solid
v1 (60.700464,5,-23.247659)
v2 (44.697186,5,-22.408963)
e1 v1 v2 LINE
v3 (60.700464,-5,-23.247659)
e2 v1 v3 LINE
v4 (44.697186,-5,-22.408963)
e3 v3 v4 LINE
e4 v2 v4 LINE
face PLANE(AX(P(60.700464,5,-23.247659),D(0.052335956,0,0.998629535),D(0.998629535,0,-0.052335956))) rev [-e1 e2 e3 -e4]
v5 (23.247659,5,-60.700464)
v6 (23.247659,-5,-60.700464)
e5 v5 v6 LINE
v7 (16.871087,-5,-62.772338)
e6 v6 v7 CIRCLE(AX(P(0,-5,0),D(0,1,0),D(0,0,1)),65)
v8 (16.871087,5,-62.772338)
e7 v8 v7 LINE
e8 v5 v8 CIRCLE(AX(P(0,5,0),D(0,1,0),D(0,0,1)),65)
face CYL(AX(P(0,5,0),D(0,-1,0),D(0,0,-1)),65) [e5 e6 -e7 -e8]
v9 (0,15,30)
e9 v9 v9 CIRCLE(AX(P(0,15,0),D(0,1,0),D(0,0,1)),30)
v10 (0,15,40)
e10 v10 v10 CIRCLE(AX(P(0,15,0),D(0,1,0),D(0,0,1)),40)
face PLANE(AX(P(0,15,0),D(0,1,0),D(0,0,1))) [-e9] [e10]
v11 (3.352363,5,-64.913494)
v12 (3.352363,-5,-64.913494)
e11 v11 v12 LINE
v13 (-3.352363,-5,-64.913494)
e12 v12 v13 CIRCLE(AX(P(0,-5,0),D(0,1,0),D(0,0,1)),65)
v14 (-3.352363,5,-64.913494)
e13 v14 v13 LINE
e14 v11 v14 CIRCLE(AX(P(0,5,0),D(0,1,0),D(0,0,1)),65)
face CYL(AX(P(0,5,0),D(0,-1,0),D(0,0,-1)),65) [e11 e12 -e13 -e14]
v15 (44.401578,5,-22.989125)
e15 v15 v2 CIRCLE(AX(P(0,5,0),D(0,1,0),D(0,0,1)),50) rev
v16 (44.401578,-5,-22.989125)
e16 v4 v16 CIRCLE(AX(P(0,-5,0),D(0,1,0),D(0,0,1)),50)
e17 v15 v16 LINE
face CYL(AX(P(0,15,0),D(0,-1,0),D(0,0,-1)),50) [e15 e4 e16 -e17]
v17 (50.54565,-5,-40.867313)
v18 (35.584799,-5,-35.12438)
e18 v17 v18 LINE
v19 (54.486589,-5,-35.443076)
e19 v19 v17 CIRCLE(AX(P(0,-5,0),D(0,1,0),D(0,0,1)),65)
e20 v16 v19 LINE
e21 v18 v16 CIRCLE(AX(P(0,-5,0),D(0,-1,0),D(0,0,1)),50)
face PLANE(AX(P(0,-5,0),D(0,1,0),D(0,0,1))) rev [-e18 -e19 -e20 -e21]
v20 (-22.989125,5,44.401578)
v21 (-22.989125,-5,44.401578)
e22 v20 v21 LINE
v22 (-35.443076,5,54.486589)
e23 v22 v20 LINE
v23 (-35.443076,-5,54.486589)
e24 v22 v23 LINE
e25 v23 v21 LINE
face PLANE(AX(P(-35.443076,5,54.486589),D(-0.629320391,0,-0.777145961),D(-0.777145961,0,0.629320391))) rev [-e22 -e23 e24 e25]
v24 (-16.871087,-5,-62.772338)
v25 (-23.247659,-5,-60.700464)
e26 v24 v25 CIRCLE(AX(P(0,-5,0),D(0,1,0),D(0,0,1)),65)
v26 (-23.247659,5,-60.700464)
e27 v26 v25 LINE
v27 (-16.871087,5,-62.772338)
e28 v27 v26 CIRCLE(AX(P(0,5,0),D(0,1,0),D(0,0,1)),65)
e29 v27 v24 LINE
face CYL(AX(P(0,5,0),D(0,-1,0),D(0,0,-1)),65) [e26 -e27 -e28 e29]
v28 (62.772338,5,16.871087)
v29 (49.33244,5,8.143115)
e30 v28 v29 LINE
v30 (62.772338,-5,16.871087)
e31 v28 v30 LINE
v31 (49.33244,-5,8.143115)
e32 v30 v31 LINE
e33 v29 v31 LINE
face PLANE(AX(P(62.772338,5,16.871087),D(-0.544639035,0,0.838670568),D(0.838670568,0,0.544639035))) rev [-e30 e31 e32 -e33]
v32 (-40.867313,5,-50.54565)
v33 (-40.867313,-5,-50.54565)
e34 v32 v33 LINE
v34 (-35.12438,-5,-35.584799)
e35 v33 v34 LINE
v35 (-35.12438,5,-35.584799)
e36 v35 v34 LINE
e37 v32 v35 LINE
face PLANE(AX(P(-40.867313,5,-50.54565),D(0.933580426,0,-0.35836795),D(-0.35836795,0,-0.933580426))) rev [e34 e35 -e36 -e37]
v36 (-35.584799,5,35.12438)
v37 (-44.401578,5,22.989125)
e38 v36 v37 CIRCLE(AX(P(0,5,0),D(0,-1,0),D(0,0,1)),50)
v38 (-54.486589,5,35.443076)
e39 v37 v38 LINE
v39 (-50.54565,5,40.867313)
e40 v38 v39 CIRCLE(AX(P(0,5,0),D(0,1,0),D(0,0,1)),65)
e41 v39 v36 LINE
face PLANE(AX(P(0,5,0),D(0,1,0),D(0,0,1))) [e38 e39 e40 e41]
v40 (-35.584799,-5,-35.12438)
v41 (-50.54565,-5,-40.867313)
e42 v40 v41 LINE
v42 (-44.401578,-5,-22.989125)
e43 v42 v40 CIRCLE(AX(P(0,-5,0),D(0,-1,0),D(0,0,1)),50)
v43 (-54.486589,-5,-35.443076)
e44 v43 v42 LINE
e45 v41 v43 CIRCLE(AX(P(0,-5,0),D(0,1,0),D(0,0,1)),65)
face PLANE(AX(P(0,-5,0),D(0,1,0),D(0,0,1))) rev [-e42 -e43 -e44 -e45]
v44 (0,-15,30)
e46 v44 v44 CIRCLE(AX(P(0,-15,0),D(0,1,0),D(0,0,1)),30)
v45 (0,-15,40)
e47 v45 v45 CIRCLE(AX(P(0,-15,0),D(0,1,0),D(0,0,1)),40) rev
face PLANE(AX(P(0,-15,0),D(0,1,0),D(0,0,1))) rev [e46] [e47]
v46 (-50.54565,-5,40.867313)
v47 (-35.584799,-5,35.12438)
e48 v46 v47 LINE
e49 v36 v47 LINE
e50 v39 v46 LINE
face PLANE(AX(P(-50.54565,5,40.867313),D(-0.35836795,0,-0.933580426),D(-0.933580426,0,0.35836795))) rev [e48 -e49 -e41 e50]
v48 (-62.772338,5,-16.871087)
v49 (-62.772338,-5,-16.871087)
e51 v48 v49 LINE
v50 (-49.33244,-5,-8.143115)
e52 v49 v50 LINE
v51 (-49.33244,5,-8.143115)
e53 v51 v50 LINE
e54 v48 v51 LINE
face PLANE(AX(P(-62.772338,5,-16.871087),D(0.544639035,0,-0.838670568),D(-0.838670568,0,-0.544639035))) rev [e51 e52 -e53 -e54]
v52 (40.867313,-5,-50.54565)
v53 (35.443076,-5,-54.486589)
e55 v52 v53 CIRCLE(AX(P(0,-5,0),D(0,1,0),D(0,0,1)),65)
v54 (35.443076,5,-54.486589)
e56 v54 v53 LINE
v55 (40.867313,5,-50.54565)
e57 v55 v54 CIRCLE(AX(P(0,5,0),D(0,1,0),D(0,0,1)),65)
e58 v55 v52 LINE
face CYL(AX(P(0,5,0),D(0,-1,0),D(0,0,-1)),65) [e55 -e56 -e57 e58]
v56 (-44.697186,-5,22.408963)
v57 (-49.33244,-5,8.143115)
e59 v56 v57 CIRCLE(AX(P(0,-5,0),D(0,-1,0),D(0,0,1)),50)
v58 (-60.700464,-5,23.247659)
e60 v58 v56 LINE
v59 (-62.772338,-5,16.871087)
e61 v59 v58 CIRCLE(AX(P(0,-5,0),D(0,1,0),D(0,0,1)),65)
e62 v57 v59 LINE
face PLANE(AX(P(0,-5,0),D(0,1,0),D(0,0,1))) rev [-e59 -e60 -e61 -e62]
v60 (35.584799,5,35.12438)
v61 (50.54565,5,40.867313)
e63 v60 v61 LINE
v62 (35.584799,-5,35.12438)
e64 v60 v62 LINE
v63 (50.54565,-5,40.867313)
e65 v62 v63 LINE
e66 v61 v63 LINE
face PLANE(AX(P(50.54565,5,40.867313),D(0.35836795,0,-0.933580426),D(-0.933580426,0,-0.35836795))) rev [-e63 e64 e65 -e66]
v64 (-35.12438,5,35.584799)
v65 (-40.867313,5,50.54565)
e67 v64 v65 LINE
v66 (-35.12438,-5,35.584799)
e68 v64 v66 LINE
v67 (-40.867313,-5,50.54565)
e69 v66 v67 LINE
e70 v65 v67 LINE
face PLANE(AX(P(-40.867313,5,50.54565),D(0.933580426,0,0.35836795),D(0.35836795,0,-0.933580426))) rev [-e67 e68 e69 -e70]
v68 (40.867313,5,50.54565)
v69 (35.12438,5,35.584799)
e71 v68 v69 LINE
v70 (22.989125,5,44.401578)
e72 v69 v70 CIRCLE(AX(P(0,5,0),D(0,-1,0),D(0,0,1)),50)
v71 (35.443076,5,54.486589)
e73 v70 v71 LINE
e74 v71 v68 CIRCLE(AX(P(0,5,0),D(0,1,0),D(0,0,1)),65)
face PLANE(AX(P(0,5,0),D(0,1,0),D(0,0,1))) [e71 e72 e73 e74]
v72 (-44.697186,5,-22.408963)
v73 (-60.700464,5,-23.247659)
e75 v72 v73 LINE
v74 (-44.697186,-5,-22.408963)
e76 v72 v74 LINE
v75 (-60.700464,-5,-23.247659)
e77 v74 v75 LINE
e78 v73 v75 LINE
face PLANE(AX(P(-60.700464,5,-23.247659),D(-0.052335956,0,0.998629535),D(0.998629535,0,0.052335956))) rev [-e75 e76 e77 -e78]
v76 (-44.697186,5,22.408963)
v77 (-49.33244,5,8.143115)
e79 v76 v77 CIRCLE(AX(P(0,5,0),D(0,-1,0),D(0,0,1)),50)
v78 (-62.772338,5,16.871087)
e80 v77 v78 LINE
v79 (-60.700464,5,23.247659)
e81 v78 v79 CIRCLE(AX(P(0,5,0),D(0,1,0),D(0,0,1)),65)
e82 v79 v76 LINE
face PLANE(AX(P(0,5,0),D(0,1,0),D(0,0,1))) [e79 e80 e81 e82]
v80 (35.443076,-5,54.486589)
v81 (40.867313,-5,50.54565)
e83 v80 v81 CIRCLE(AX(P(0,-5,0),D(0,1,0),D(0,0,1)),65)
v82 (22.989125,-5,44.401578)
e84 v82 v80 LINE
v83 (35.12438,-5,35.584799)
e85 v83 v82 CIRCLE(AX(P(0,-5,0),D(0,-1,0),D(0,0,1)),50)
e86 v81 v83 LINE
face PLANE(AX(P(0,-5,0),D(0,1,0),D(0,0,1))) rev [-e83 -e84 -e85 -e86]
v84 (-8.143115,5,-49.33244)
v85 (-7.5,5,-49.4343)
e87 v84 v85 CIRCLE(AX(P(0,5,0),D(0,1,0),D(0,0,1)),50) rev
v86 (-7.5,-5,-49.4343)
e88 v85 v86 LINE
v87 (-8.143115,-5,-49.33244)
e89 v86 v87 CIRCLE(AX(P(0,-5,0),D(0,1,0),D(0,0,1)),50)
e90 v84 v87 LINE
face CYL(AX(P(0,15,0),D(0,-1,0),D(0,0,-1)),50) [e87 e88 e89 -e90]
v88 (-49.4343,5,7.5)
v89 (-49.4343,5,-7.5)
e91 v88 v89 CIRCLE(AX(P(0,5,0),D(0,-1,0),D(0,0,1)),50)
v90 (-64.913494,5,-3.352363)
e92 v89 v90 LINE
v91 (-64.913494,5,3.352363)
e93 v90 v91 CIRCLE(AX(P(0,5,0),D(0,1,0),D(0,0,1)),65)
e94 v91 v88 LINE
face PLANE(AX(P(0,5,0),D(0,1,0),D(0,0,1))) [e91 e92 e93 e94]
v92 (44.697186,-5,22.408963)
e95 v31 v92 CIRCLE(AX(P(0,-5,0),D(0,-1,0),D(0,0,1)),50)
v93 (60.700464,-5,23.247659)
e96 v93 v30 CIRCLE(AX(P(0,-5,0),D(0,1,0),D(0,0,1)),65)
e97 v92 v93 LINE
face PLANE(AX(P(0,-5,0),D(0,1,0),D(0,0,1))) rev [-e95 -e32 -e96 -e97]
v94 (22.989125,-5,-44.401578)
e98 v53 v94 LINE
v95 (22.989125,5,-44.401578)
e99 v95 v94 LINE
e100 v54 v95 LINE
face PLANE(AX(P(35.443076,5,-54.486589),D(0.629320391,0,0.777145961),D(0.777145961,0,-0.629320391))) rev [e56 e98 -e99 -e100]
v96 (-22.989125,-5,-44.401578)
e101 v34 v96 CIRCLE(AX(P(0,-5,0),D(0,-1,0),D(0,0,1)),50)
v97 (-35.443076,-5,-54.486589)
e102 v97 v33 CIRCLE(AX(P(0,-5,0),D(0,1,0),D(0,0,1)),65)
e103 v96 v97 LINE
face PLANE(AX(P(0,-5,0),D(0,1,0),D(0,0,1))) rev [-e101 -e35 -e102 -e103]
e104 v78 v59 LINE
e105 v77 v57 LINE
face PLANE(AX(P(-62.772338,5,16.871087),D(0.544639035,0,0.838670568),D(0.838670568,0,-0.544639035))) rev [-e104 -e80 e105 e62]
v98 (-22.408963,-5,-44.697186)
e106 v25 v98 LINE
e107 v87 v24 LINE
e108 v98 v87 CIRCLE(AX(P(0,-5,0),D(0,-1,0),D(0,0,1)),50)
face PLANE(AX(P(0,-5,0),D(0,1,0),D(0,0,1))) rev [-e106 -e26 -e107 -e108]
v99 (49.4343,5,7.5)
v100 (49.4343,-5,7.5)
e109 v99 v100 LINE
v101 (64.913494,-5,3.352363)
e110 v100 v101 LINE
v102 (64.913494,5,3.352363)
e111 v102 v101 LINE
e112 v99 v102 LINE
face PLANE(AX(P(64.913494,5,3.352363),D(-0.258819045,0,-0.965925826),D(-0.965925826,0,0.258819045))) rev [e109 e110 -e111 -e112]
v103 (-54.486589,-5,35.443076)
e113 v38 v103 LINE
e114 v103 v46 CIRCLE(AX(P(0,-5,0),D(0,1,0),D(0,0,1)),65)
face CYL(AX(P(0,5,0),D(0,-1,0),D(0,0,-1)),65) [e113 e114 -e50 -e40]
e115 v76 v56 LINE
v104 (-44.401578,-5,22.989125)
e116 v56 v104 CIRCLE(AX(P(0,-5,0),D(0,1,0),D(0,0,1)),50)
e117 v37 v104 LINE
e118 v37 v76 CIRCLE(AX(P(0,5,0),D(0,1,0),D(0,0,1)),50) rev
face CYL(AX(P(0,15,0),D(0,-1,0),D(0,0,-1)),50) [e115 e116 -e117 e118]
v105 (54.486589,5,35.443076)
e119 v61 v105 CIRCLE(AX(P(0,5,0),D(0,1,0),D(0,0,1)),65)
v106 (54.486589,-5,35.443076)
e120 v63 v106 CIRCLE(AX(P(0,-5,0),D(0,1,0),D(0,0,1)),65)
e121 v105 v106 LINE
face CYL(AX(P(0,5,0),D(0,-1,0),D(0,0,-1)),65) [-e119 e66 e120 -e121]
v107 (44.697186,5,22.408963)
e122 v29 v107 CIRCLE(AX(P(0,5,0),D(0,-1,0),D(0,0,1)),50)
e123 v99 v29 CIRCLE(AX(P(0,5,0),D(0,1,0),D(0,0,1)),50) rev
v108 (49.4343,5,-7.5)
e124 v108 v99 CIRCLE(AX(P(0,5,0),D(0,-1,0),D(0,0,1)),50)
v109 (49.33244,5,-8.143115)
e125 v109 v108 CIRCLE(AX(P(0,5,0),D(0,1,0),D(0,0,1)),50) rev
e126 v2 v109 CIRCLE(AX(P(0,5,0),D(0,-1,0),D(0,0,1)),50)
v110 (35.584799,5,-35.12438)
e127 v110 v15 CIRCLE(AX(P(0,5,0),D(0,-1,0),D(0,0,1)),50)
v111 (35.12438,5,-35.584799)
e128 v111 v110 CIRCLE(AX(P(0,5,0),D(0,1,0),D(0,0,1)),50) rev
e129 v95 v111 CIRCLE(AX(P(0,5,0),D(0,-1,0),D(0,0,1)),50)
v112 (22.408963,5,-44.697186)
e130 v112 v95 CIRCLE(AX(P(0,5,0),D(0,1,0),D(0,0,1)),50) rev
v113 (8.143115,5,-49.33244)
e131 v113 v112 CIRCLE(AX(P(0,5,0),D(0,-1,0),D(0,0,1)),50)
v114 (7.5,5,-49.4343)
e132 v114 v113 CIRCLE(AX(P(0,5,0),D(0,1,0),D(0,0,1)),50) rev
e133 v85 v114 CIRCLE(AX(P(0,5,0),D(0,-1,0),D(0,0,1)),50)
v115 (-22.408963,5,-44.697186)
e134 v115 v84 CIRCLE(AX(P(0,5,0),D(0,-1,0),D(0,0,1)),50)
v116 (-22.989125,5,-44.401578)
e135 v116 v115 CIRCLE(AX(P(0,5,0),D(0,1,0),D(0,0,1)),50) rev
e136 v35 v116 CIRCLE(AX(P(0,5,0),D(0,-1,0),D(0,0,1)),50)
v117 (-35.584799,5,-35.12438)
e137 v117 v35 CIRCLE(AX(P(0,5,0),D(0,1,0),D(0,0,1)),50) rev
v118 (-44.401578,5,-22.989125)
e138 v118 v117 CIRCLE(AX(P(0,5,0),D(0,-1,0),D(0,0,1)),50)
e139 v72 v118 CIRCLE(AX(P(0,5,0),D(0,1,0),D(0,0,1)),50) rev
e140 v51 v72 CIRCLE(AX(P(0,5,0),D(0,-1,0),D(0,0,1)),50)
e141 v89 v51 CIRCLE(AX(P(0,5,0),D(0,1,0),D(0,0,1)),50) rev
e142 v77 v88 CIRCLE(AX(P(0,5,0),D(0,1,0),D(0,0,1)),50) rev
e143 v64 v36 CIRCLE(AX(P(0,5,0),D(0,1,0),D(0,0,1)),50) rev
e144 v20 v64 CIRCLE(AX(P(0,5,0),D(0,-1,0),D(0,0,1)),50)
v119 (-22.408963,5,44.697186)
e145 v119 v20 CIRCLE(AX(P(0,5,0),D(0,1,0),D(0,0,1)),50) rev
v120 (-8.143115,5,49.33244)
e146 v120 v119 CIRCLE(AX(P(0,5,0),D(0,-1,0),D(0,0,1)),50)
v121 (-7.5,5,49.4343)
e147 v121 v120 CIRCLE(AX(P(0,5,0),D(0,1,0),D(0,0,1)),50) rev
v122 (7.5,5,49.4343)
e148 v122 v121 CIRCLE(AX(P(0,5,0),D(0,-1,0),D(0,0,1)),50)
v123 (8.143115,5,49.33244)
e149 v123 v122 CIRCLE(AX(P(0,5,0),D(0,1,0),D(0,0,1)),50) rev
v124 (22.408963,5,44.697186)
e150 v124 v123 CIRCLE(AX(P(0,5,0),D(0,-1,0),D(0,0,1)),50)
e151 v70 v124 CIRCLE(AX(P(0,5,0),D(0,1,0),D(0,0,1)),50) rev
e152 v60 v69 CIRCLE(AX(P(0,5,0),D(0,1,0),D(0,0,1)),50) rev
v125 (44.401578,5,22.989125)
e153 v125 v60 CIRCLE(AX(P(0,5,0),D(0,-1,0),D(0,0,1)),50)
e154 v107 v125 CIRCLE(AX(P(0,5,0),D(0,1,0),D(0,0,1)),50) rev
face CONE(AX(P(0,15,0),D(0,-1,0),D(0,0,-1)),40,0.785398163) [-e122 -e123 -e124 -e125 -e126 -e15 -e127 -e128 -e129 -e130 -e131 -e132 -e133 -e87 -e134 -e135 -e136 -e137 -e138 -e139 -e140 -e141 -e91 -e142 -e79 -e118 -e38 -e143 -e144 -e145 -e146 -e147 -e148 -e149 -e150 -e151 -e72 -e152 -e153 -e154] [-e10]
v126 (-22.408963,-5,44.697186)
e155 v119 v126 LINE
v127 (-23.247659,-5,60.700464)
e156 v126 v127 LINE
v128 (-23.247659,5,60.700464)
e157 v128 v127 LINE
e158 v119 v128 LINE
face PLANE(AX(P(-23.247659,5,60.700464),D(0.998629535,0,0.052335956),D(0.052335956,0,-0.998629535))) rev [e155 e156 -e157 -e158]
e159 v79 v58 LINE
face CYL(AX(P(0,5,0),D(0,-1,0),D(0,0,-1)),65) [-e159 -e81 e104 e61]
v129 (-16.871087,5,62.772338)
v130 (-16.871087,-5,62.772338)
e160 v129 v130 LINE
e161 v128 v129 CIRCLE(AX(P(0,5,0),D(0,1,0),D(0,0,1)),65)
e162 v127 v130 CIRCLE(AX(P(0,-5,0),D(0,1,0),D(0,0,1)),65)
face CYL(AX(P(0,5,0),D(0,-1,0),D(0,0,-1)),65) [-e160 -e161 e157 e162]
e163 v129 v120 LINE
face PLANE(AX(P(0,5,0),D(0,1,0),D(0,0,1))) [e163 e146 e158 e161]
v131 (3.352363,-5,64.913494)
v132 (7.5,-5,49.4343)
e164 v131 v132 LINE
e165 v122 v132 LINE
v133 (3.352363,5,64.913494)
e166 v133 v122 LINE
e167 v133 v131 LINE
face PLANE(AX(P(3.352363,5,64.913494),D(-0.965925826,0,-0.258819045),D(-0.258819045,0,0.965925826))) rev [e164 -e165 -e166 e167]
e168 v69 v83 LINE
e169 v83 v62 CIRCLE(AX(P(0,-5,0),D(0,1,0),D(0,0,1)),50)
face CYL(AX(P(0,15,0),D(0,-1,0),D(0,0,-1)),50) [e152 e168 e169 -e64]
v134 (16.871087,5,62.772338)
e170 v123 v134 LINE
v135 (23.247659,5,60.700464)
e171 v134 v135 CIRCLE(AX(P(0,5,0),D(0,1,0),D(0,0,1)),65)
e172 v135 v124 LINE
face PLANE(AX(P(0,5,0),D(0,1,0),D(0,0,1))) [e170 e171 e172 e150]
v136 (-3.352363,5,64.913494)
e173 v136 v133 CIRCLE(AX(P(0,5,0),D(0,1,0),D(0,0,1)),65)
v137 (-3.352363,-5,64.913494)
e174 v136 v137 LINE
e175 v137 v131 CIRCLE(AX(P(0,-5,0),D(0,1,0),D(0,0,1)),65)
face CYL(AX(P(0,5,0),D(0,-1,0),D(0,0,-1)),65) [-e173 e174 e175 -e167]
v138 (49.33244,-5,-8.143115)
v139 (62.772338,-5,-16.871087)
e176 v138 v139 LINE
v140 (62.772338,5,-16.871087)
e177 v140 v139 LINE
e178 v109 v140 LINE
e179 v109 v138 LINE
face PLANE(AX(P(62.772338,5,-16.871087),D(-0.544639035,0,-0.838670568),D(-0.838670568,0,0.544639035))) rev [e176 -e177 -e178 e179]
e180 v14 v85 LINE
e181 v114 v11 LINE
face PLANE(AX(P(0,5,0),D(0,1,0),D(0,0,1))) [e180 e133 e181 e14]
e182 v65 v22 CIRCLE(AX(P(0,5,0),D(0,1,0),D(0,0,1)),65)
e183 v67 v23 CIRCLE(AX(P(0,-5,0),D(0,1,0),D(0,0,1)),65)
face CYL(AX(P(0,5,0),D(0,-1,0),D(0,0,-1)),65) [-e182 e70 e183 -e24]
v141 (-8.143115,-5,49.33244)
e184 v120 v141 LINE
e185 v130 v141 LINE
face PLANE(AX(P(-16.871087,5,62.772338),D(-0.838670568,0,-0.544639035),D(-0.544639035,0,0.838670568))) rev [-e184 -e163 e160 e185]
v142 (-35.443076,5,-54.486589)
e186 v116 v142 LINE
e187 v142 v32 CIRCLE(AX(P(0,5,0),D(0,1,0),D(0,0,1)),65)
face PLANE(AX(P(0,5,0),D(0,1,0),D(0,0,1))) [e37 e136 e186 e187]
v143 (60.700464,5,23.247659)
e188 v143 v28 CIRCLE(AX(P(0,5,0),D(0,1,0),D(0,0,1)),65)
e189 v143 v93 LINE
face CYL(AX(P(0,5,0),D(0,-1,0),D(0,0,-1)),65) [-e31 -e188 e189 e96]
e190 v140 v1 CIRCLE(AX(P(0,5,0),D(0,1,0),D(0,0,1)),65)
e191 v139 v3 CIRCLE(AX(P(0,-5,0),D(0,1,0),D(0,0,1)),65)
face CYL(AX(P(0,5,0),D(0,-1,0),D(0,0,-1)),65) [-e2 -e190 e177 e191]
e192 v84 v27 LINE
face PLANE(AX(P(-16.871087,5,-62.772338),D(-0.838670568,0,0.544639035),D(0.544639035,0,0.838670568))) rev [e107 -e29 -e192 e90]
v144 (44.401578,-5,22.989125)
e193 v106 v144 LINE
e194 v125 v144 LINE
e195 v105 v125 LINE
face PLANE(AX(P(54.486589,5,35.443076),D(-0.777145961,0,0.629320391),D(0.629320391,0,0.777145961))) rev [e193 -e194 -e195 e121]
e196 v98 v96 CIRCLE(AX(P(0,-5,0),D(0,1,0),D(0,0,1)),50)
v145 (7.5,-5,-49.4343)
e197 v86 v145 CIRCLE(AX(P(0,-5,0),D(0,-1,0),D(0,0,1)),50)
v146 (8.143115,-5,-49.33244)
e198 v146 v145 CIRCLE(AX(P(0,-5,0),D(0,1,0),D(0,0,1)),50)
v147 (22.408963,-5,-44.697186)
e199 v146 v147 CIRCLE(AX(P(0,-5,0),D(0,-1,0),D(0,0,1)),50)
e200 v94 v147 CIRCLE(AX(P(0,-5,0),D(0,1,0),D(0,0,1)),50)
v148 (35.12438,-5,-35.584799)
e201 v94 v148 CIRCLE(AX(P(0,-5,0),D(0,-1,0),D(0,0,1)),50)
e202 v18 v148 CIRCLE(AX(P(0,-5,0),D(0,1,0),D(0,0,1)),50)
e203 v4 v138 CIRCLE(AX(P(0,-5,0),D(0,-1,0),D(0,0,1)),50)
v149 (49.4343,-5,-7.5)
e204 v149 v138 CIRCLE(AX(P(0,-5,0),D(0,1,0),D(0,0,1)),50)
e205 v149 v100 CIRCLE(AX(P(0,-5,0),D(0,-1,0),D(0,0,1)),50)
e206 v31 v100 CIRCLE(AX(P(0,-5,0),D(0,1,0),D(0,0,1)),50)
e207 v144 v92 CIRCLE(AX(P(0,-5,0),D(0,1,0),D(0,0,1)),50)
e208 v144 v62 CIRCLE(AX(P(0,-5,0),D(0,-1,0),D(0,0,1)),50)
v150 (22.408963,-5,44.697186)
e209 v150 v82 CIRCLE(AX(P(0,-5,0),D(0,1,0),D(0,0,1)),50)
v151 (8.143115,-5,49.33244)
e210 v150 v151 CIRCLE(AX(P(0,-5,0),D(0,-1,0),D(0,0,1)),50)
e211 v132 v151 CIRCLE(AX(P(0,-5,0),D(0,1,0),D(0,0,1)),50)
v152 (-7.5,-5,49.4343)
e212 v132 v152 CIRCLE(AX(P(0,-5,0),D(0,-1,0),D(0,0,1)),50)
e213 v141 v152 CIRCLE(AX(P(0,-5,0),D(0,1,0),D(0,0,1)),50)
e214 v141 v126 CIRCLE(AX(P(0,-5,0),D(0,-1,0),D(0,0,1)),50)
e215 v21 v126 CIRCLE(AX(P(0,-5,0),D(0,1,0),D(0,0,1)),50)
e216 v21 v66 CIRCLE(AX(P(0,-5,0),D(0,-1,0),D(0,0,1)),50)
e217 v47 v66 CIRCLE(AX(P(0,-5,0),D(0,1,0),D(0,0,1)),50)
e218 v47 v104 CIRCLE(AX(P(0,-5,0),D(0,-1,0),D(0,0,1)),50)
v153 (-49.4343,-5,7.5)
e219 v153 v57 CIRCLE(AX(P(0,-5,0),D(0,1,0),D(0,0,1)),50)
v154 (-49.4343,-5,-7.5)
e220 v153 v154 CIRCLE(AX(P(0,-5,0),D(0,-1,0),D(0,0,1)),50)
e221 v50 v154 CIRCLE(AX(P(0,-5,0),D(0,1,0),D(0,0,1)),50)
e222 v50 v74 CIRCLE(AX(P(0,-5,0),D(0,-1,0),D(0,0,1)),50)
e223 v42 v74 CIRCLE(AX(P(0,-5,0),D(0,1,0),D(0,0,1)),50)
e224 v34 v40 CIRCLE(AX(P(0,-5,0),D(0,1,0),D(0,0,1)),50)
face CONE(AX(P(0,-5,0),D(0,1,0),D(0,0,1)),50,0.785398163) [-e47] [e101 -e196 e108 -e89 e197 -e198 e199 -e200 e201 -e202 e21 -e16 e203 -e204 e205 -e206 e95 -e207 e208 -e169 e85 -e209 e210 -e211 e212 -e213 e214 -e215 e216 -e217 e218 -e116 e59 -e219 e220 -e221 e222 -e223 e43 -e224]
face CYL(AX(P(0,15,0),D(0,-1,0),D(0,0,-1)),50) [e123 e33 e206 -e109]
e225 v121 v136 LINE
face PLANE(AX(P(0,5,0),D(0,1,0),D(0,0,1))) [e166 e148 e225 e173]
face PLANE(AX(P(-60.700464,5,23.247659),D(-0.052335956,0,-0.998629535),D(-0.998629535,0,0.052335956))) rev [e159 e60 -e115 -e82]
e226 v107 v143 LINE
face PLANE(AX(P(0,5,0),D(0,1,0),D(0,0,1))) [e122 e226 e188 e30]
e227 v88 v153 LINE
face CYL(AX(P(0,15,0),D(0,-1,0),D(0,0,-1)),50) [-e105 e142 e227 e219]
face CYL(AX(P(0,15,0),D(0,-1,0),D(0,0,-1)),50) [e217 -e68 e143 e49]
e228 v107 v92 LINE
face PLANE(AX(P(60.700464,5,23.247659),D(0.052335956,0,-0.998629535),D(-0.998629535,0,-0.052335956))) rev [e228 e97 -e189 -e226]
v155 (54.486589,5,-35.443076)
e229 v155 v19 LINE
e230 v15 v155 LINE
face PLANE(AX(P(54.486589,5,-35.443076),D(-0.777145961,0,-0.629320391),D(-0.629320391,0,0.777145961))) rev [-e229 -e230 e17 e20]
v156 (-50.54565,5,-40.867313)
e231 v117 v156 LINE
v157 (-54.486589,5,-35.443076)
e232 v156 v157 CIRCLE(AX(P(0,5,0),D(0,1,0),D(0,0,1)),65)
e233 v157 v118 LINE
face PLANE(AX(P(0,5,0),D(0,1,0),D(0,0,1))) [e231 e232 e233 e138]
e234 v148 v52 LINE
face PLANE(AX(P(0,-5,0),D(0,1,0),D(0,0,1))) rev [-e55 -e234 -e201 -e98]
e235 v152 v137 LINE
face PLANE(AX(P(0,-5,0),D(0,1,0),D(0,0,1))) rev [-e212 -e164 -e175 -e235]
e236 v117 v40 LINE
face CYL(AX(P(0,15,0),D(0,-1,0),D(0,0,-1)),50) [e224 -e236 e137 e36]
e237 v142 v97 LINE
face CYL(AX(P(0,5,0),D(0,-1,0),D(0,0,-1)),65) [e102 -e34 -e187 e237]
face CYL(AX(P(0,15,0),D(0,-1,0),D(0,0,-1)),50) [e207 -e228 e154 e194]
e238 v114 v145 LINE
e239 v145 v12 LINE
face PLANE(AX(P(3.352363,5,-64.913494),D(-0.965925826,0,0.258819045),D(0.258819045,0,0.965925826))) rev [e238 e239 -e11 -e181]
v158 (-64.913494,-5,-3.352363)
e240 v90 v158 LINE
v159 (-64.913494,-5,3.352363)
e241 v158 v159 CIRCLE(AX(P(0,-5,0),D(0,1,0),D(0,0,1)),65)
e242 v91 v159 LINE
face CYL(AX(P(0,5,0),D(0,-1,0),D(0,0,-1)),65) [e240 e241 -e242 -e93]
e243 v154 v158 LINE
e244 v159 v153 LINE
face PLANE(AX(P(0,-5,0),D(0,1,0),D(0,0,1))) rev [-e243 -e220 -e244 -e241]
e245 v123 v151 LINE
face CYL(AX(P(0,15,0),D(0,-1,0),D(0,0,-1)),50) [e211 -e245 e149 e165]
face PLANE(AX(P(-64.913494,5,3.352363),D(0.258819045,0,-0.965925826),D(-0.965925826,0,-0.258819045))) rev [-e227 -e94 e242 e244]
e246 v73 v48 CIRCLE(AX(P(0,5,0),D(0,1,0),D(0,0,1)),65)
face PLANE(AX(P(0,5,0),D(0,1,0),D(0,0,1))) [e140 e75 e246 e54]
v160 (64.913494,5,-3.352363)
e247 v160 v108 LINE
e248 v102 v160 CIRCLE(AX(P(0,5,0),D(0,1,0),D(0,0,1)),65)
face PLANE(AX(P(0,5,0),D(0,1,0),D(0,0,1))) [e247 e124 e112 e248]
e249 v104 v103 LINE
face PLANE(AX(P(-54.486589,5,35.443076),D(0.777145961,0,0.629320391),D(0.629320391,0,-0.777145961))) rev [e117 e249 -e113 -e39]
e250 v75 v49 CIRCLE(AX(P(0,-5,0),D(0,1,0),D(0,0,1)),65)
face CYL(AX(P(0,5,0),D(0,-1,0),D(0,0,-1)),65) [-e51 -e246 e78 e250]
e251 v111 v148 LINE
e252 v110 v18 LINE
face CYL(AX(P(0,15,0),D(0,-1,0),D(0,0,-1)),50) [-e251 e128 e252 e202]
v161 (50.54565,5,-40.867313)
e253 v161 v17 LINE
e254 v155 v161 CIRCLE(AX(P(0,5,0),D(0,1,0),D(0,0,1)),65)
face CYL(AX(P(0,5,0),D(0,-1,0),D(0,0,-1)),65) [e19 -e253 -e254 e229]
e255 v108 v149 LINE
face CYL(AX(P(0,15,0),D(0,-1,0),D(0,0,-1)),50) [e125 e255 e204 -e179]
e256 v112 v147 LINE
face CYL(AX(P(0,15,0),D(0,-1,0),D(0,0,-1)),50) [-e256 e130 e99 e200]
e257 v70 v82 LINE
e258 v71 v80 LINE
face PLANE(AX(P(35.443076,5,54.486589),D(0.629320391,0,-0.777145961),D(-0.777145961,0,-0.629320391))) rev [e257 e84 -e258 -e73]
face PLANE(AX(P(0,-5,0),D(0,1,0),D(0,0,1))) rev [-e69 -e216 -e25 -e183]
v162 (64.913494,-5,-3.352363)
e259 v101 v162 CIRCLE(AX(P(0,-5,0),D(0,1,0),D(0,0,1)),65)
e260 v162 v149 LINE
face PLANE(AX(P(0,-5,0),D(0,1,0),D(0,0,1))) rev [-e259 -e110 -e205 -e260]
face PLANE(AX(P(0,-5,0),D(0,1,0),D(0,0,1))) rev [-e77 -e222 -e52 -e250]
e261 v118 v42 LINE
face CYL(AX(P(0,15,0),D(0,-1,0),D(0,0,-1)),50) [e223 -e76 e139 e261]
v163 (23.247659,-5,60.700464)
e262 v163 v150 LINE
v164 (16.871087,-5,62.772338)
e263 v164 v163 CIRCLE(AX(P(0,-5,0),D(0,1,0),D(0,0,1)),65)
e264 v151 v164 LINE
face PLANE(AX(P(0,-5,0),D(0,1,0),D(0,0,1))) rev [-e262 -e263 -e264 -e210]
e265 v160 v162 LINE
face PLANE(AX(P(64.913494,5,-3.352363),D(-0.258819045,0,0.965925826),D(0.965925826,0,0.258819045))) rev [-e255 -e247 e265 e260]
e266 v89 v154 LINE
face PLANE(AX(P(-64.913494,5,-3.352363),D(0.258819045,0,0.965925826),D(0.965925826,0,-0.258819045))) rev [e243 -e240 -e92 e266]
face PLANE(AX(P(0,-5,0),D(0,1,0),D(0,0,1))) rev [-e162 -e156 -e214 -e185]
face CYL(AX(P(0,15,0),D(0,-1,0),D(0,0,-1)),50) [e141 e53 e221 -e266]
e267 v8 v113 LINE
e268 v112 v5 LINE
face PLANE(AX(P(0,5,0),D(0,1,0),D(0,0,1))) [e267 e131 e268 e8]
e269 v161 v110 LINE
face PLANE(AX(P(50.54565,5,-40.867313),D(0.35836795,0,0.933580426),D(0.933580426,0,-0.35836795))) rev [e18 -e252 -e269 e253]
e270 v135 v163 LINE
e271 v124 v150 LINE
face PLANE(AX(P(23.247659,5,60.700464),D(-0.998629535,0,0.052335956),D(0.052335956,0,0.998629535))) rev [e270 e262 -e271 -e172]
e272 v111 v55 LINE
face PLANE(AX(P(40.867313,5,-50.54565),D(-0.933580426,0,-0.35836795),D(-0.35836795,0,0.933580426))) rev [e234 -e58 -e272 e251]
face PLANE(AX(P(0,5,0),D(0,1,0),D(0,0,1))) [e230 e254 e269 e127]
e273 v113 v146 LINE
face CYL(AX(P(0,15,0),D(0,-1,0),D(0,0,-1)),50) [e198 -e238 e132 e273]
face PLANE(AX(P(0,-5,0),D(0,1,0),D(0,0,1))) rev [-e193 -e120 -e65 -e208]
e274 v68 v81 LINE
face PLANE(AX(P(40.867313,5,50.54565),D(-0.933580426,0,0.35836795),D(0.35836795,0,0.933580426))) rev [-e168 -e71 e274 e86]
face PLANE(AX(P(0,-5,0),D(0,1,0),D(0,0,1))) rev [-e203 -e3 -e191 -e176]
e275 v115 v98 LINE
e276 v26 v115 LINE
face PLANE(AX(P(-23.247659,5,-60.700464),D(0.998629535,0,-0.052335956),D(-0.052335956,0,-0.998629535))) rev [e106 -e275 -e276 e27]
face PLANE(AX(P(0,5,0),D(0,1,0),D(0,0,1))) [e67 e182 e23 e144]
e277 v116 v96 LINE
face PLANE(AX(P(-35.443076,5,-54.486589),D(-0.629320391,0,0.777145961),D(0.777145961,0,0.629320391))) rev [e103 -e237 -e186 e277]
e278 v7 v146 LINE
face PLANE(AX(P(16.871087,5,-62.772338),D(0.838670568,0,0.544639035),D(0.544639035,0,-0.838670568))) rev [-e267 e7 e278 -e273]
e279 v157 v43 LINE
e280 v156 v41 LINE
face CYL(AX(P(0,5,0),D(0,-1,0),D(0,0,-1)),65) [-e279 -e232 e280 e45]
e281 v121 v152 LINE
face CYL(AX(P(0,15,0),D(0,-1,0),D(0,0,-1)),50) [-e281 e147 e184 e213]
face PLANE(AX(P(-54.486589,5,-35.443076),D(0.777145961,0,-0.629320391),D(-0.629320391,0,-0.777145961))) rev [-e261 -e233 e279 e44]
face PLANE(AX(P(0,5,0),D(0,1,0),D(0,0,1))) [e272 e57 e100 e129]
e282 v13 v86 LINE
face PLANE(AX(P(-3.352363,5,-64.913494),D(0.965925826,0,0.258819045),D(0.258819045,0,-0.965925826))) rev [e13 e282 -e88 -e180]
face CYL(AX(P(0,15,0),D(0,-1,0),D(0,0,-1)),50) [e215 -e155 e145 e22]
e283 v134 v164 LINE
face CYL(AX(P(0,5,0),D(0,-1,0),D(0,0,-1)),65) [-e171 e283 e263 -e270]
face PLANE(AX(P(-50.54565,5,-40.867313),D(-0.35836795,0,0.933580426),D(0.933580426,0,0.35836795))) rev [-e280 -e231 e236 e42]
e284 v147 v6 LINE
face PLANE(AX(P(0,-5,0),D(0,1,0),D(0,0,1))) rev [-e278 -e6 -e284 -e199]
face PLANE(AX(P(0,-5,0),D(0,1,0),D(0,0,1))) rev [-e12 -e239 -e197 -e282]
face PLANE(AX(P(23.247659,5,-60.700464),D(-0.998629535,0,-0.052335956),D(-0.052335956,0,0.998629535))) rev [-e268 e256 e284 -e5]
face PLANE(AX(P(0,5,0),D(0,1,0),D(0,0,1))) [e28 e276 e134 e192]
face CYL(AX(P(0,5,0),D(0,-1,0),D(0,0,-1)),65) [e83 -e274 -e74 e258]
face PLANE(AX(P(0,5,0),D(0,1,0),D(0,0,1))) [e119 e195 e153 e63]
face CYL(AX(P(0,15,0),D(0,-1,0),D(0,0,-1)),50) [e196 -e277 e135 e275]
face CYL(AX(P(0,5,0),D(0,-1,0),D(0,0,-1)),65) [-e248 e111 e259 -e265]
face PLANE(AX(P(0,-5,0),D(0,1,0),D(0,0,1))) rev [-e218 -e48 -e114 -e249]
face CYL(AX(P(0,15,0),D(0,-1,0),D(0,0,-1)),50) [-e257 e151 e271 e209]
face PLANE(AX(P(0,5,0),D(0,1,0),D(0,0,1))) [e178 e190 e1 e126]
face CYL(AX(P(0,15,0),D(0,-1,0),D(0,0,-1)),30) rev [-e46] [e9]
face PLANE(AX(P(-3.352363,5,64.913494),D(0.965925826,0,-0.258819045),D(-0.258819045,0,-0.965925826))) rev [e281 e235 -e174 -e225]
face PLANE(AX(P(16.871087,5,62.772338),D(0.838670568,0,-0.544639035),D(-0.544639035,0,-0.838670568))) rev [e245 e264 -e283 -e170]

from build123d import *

# Parameters (mm, degrees)
EXTRUDE_1_DEPTH    = 5
EXTRUDE_1_2_DEPTH  = 5
EXTRUDE_1_3_DEPTH  = 5
EXTRUDE_1_4_DEPTH  = 5
EXTRUDE_1_5_DEPTH  = 5
EXTRUDE_1_6_DEPTH  = 5
EXTRUDE_1_7_DEPTH  = 5
EXTRUDE_1_8_DEPTH  = 5
EXTRUDE_1_9_DEPTH  = 5
EXTRUDE_1_10_DEPTH = 5
EXTRUDE_1_11_DEPTH = 5
EXTRUDE_1_12_DEPTH = 5
EXTRUDE_1_13_DEPTH = 5
EXTRUDE_1_14_DEPTH = 5
EXTRUDE_1_15_DEPTH = 5
EXTRUDE_1_16_DEPTH = 5
EXTRUDE_1_17_DEPTH = 5
EXTRUDE_1_18_DEPTH = 5
EXTRUDE_1_19_DEPTH = 5
EXTRUDE_1_20_DEPTH = 5
SKETCH_2_R         = 50
SKETCH_2_R_2       = 30
EXTRUDE_2_DEPTH    = 15
CHAMFER_1_SIZE     = 10


with BuildPart() as part:
    # 草图1 → 凸台-拉伸1 (new, symmetric)
    with BuildSketch(Plane(origin=(0, 0, 0), x_dir=(1, 0, 0), z_dir=(0, 1, 0))):
        with BuildLine():
            Line((-3.352362501, 64.91349371), (-7.5, 49.434299833))
            ThreePointArc((-7.5, 49.434299833), (0, 50), (7.5, 49.434299833))
            Line((7.5, 49.434299833), (3.352362501, 64.91349371))
            ThreePointArc((3.352362501, 64.91349371), (0, 65), (-3.352362501, 64.91349371))
        make_face()
    extrude(amount=EXTRUDE_1_DEPTH, both=True)



with BuildPart() as body_2:
    # 草图1 → Extrude 1 2 (new, symmetric)
    with BuildSketch(Plane(origin=(0, 0, 0), x_dir=(1, 0, 0), z_dir=(0, 1, 0))):
        with BuildLine():
            Line((16.871086519, 62.772338173), (8.143114881, 49.332440443))
            ThreePointArc((8.143114881, 49.332440443), (15.450849719, 47.552825815), (22.408962626, 44.697185527))
            Line((22.408962626, 44.697185527), (23.247658922, 60.700464204))
            ThreePointArc((23.247658922, 60.700464204), (20.086104634, 61.818673559), (16.871086519, 62.772338173))
        make_face()
    extrude(amount=EXTRUDE_1_2_DEPTH, both=True)


with BuildPart() as body_3:
    # 草图1 → Extrude 1 3 (new, symmetric)
    with BuildSketch(Plane(origin=(0, 0, 0), x_dir=(1, 0, 0), z_dir=(0, 1, 0))):
        with BuildLine():
            Line((35.443076043, 54.486588814), (22.989124942, 44.401578062))
            ThreePointArc((22.989124942, 44.401578062), (29.389262615, 40.450849719), (35.124379857, 35.584799278))
            Line((35.124379857, 35.584799278), (40.867312512, 50.545650337))
            ThreePointArc((40.867312512, 50.545650337), (38.206041399, 52.586104634), (35.443076043, 54.486588814))
        make_face()
    extrude(amount=EXTRUDE_1_3_DEPTH, both=True)


with BuildPart() as body_4:
    # 草图1 → Extrude 1 4 (new, symmetric)
    with BuildSketch(Plane(origin=(0, 0, 0), x_dir=(1, 0, 0), z_dir=(0, 1, 0))):
        with BuildLine():
            Line((50.545650337, 40.867312512), (35.584799278, 35.124379857))
            ThreePointArc((35.584799278, 35.124379857), (40.450849719, 29.389262615), (44.401578062, 22.989124942))
            Line((44.401578062, 22.989124942), (54.486588814, 35.443076043))
            ThreePointArc((54.486588814, 35.443076043), (52.586104634, 38.206041399), (50.545650337, 40.867312512))
        make_face()
    extrude(amount=EXTRUDE_1_4_DEPTH, both=True)


with BuildPart() as body_5:
    # 草图1 → Extrude 1 5 (new, symmetric)
    with BuildSketch(Plane(origin=(0, 0, 0), x_dir=(1, 0, 0), z_dir=(0, 1, 0))):
        with BuildLine():
            Line((60.700464204, 23.247658922), (44.697185527, 22.408962626))
            ThreePointArc((44.697185527, 22.408962626), (47.552825815, 15.450849719), (49.332440443, 8.143114881))
            Line((49.332440443, 8.143114881), (62.772338173, 16.871086519))
            ThreePointArc((62.772338173, 16.871086519), (61.818673559, 20.086104634), (60.700464204, 23.247658922))
        make_face()
    extrude(amount=EXTRUDE_1_5_DEPTH, both=True)


with BuildPart() as body_6:
    # 草图1 → Extrude 1 6 (new, symmetric)
    with BuildSketch(Plane(origin=(0, 0, 0), x_dir=(1, 0, 0), z_dir=(0, 1, 0))):
        with BuildLine():
            Line((64.91349371, 3.352362501), (49.434299833, 7.5))
            ThreePointArc((49.434299833, 7.5), (50, 0), (49.434299833, -7.5))
            Line((49.434299833, -7.5), (64.91349371, -3.352362501))
            ThreePointArc((64.91349371, -3.352362501), (65, 0), (64.91349371, 3.352362501))
        make_face()
    extrude(amount=EXTRUDE_1_6_DEPTH, both=True)


with BuildPart() as body_7:
    # 草图1 → Extrude 1 7 (new, symmetric)
    with BuildSketch(Plane(origin=(0, 0, 0), x_dir=(1, 0, 0), z_dir=(0, 1, 0))):
        with BuildLine():
            Line((62.772338173, -16.871086519), (49.332440443, -8.143114881))
            ThreePointArc((49.332440443, -8.143114881), (47.552825815, -15.450849719), (44.697185527, -22.408962626))
            Line((44.697185527, -22.408962626), (60.700464204, -23.247658922))
            ThreePointArc((60.700464204, -23.247658922), (61.818673559, -20.086104634), (62.772338173, -16.871086519))
        make_face()
    extrude(amount=EXTRUDE_1_7_DEPTH, both=True)


with BuildPart() as body_8:
    # 草图1 → Extrude 1 8 (new, symmetric)
    with BuildSketch(Plane(origin=(0, 0, 0), x_dir=(1, 0, 0), z_dir=(0, 1, 0))):
        with BuildLine():
            Line((54.486588814, -35.443076043), (44.401578062, -22.989124942))
            ThreePointArc((44.401578062, -22.989124942), (40.450849719, -29.389262615), (35.584799278, -35.124379857))
            Line((35.584799278, -35.124379857), (50.545650337, -40.867312512))
            ThreePointArc((50.545650337, -40.867312512), (52.586104634, -38.206041399), (54.486588814, -35.443076043))
        make_face()
    extrude(amount=EXTRUDE_1_8_DEPTH, both=True)


with BuildPart() as body_9:
    # 草图1 → Extrude 1 9 (new, symmetric)
    with BuildSketch(Plane(origin=(0, 0, 0), x_dir=(1, 0, 0), z_dir=(0, 1, 0))):
        with BuildLine():
            Line((40.867312512, -50.545650337), (35.124379857, -35.584799278))
            ThreePointArc((35.124379857, -35.584799278), (29.389262615, -40.450849719), (22.989124942, -44.401578062))
            Line((22.989124942, -44.401578062), (35.443076043, -54.486588814))
            ThreePointArc((35.443076043, -54.486588814), (38.206041399, -52.586104634), (40.867312512, -50.545650337))
        make_face()
    extrude(amount=EXTRUDE_1_9_DEPTH, both=True)


with BuildPart() as body_10:
    # 草图1 → Extrude 1 10 (new, symmetric)
    with BuildSketch(Plane(origin=(0, 0, 0), x_dir=(1, 0, 0), z_dir=(0, 1, 0))):
        with BuildLine():
            Line((23.247658922, -60.700464204), (22.408962626, -44.697185527))
            ThreePointArc((22.408962626, -44.697185527), (15.450849719, -47.552825815), (8.143114881, -49.332440443))
            Line((8.143114881, -49.332440443), (16.871086519, -62.772338173))
            ThreePointArc((16.871086519, -62.772338173), (20.086104634, -61.818673559), (23.247658922, -60.700464204))
        make_face()
    extrude(amount=EXTRUDE_1_10_DEPTH, both=True)


with BuildPart() as body_11:
    # 草图1 → Extrude 1 11 (new, symmetric)
    with BuildSketch(Plane(origin=(0, 0, 0), x_dir=(1, 0, 0), z_dir=(0, 1, 0))):
        with BuildLine():
            Line((3.352362501, -64.91349371), (7.5, -49.434299833))
            ThreePointArc((7.5, -49.434299833), (0, -50), (-7.5, -49.434299833))
            Line((-7.5, -49.434299833), (-3.352362501, -64.91349371))
            ThreePointArc((-3.352362501, -64.91349371), (0, -65), (3.352362501, -64.91349371))
        make_face()
    extrude(amount=EXTRUDE_1_11_DEPTH, both=True)


with BuildPart() as body_12:
    # 草图1 → Extrude 1 12 (new, symmetric)
    with BuildSketch(Plane(origin=(0, 0, 0), x_dir=(1, 0, 0), z_dir=(0, 1, 0))):
        with BuildLine():
            Line((-16.871086519, -62.772338173), (-8.143114881, -49.332440443))
            ThreePointArc((-8.143114881, -49.332440443), (-15.450849719, -47.552825815), (-22.408962626, -44.697185527))
            Line((-22.408962626, -44.697185527), (-23.247658922, -60.700464204))
            ThreePointArc((-23.247658922, -60.700464204), (-20.086104634, -61.818673559), (-16.871086519, -62.772338173))
        make_face()
    extrude(amount=EXTRUDE_1_12_DEPTH, both=True)


with BuildPart() as body_13:
    # 草图1 → Extrude 1 13 (new, symmetric)
    with BuildSketch(Plane(origin=(0, 0, 0), x_dir=(1, 0, 0), z_dir=(0, 1, 0))):
        with BuildLine():
            Line((-35.443076043, -54.486588814), (-22.989124942, -44.401578062))
            ThreePointArc((-22.989124942, -44.401578062), (-29.389262615, -40.450849719), (-35.124379857, -35.584799278))
            Line((-35.124379857, -35.584799278), (-40.867312512, -50.545650337))
            ThreePointArc((-40.867312512, -50.545650337), (-38.206041399, -52.586104634), (-35.443076043, -54.486588814))
        make_face()
    extrude(amount=EXTRUDE_1_13_DEPTH, both=True)


with BuildPart() as body_14:
    # 草图1 → Extrude 1 14 (new, symmetric)
    with BuildSketch(Plane(origin=(0, 0, 0), x_dir=(1, 0, 0), z_dir=(0, 1, 0))):
        with BuildLine():
            Line((-50.545650337, -40.867312512), (-35.584799278, -35.124379857))
            ThreePointArc((-35.584799278, -35.124379857), (-40.450849719, -29.389262615), (-44.401578062, -22.989124942))
            Line((-44.401578062, -22.989124942), (-54.486588814, -35.443076043))
            ThreePointArc((-54.486588814, -35.443076043), (-52.586104634, -38.206041399), (-50.545650337, -40.867312512))
        make_face()
    extrude(amount=EXTRUDE_1_14_DEPTH, both=True)


with BuildPart() as body_15:
    # 草图1 → Extrude 1 15 (new, symmetric)
    with BuildSketch(Plane(origin=(0, 0, 0), x_dir=(1, 0, 0), z_dir=(0, 1, 0))):
        with BuildLine():
            Line((-60.700464204, -23.247658922), (-44.697185527, -22.408962626))
            ThreePointArc((-44.697185527, -22.408962626), (-47.552825815, -15.450849719), (-49.332440443, -8.143114881))
            Line((-49.332440443, -8.143114881), (-62.772338173, -16.871086519))
            ThreePointArc((-62.772338173, -16.871086519), (-61.818673559, -20.086104634), (-60.700464204, -23.247658922))
        make_face()
    extrude(amount=EXTRUDE_1_15_DEPTH, both=True)


with BuildPart() as body_16:
    # 草图1 → Extrude 1 16 (new, symmetric)
    with BuildSketch(Plane(origin=(0, 0, 0), x_dir=(1, 0, 0), z_dir=(0, 1, 0))):
        with BuildLine():
            Line((-64.91349371, -3.352362501), (-49.434299833, -7.5))
            ThreePointArc((-49.434299833, -7.5), (-50, 0), (-49.434299833, 7.5))
            Line((-49.434299833, 7.5), (-64.91349371, 3.352362501))
            ThreePointArc((-64.91349371, 3.352362501), (-65, 0), (-64.91349371, -3.352362501))
        make_face()
    extrude(amount=EXTRUDE_1_16_DEPTH, both=True)


with BuildPart() as body_17:
    # 草图1 → Extrude 1 17 (new, symmetric)
    with BuildSketch(Plane(origin=(0, 0, 0), x_dir=(1, 0, 0), z_dir=(0, 1, 0))):
        with BuildLine():
            Line((-62.772338173, 16.871086519), (-49.332440443, 8.143114881))
            ThreePointArc((-49.332440443, 8.143114881), (-47.552825815, 15.450849719), (-44.697185527, 22.408962626))
            Line((-44.697185527, 22.408962626), (-60.700464204, 23.247658922))
            ThreePointArc((-60.700464204, 23.247658922), (-61.818673559, 20.086104634), (-62.772338173, 16.871086519))
        make_face()
    extrude(amount=EXTRUDE_1_17_DEPTH, both=True)


with BuildPart() as body_18:
    # 草图1 → Extrude 1 18 (new, symmetric)
    with BuildSketch(Plane(origin=(0, 0, 0), x_dir=(1, 0, 0), z_dir=(0, 1, 0))):
        with BuildLine():
            Line((-54.486588814, 35.443076043), (-44.401578062, 22.989124942))
            ThreePointArc((-44.401578062, 22.989124942), (-40.450849719, 29.389262615), (-35.584799278, 35.124379857))
            Line((-35.584799278, 35.124379857), (-50.545650337, 40.867312512))
            ThreePointArc((-50.545650337, 40.867312512), (-52.586104634, 38.206041399), (-54.486588814, 35.443076043))
        make_face()
    extrude(amount=EXTRUDE_1_18_DEPTH, both=True)


with BuildPart() as body_19:
    # 草图1 → Extrude 1 19 (new, symmetric)
    with BuildSketch(Plane(origin=(0, 0, 0), x_dir=(1, 0, 0), z_dir=(0, 1, 0))):
        with BuildLine():
            Line((-40.867312512, 50.545650337), (-35.124379857, 35.584799278))
            ThreePointArc((-35.124379857, 35.584799278), (-29.389262615, 40.450849719), (-22.989124942, 44.401578062))
            Line((-22.989124942, 44.401578062), (-35.443076043, 54.486588814))
            ThreePointArc((-35.443076043, 54.486588814), (-38.206041399, 52.586104634), (-40.867312512, 50.545650337))
        make_face()
    extrude(amount=EXTRUDE_1_19_DEPTH, both=True)


with BuildPart() as body_20:
    # 草图1 → Extrude 1 20 (new, symmetric)
    with BuildSketch(Plane(origin=(0, 0, 0), x_dir=(1, 0, 0), z_dir=(0, 1, 0))):
        with BuildLine():
            Line((-23.247658922, 60.700464204), (-22.408962626, 44.697185527))
            ThreePointArc((-22.408962626, 44.697185527), (-15.450849719, 47.552825815), (-8.143114881, 49.332440443))
            Line((-8.143114881, 49.332440443), (-16.871086519, 62.772338173))
            ThreePointArc((-16.871086519, 62.772338173), (-20.086104634, 61.818673559), (-23.247658922, 60.700464204))
        make_face()
    extrude(amount=EXTRUDE_1_20_DEPTH, both=True)


with BuildPart() as part_1:
    add(part.part)

    add(body_2.part)  # 凸台-拉伸2 merges body 2

    add(body_3.part)  # 凸台-拉伸2 merges body 3

    add(body_4.part)  # 凸台-拉伸2 merges body 4

    add(body_5.part)  # 凸台-拉伸2 merges body 5

    add(body_6.part)  # 凸台-拉伸2 merges body 6

    add(body_7.part)  # 凸台-拉伸2 merges body 7

    add(body_8.part)  # 凸台-拉伸2 merges body 8

    add(body_9.part)  # 凸台-拉伸2 merges body 9

    add(body_10.part)  # 凸台-拉伸2 merges body 10

    add(body_11.part)  # 凸台-拉伸2 merges body 11

    add(body_12.part)  # 凸台-拉伸2 merges body 12

    add(body_13.part)  # 凸台-拉伸2 merges body 13

    add(body_14.part)  # 凸台-拉伸2 merges body 14

    add(body_15.part)  # 凸台-拉伸2 merges body 15

    add(body_16.part)  # 凸台-拉伸2 merges body 16

    add(body_17.part)  # 凸台-拉伸2 merges body 17

    add(body_18.part)  # 凸台-拉伸2 merges body 18

    add(body_19.part)  # 凸台-拉伸2 merges body 19

    add(body_20.part)  # 凸台-拉伸2 merges body 20
    # 草图2 → 凸台-拉伸2 (add, symmetric)
    with BuildSketch(Plane(origin=(0, 0, 0), x_dir=(1, 0, 0), z_dir=(0, 1, 0))):
        with Locations(Location((0, 0, 0), (0, 0, 270))):
            Circle(SKETCH_2_R)
        with Locations(Location((0, 0, 0), (0, 0, 270))):
            Circle(SKETCH_2_R_2, mode=Mode.SUBTRACT)
    extrude(amount=EXTRUDE_2_DEPTH, both=True)

    # 倒角1
    chamfer_1_edges = [part_1.edges().sort_by_distance(p)[0] for p in [
        (0, 15, -50),
        (0, -15, -50),
    ]]
    chamfer(chamfer_1_edges, length=CHAMFER_1_SIZE - 0.0001)  # a hair under: the kernel refuses the full size


solid = part_1.part
